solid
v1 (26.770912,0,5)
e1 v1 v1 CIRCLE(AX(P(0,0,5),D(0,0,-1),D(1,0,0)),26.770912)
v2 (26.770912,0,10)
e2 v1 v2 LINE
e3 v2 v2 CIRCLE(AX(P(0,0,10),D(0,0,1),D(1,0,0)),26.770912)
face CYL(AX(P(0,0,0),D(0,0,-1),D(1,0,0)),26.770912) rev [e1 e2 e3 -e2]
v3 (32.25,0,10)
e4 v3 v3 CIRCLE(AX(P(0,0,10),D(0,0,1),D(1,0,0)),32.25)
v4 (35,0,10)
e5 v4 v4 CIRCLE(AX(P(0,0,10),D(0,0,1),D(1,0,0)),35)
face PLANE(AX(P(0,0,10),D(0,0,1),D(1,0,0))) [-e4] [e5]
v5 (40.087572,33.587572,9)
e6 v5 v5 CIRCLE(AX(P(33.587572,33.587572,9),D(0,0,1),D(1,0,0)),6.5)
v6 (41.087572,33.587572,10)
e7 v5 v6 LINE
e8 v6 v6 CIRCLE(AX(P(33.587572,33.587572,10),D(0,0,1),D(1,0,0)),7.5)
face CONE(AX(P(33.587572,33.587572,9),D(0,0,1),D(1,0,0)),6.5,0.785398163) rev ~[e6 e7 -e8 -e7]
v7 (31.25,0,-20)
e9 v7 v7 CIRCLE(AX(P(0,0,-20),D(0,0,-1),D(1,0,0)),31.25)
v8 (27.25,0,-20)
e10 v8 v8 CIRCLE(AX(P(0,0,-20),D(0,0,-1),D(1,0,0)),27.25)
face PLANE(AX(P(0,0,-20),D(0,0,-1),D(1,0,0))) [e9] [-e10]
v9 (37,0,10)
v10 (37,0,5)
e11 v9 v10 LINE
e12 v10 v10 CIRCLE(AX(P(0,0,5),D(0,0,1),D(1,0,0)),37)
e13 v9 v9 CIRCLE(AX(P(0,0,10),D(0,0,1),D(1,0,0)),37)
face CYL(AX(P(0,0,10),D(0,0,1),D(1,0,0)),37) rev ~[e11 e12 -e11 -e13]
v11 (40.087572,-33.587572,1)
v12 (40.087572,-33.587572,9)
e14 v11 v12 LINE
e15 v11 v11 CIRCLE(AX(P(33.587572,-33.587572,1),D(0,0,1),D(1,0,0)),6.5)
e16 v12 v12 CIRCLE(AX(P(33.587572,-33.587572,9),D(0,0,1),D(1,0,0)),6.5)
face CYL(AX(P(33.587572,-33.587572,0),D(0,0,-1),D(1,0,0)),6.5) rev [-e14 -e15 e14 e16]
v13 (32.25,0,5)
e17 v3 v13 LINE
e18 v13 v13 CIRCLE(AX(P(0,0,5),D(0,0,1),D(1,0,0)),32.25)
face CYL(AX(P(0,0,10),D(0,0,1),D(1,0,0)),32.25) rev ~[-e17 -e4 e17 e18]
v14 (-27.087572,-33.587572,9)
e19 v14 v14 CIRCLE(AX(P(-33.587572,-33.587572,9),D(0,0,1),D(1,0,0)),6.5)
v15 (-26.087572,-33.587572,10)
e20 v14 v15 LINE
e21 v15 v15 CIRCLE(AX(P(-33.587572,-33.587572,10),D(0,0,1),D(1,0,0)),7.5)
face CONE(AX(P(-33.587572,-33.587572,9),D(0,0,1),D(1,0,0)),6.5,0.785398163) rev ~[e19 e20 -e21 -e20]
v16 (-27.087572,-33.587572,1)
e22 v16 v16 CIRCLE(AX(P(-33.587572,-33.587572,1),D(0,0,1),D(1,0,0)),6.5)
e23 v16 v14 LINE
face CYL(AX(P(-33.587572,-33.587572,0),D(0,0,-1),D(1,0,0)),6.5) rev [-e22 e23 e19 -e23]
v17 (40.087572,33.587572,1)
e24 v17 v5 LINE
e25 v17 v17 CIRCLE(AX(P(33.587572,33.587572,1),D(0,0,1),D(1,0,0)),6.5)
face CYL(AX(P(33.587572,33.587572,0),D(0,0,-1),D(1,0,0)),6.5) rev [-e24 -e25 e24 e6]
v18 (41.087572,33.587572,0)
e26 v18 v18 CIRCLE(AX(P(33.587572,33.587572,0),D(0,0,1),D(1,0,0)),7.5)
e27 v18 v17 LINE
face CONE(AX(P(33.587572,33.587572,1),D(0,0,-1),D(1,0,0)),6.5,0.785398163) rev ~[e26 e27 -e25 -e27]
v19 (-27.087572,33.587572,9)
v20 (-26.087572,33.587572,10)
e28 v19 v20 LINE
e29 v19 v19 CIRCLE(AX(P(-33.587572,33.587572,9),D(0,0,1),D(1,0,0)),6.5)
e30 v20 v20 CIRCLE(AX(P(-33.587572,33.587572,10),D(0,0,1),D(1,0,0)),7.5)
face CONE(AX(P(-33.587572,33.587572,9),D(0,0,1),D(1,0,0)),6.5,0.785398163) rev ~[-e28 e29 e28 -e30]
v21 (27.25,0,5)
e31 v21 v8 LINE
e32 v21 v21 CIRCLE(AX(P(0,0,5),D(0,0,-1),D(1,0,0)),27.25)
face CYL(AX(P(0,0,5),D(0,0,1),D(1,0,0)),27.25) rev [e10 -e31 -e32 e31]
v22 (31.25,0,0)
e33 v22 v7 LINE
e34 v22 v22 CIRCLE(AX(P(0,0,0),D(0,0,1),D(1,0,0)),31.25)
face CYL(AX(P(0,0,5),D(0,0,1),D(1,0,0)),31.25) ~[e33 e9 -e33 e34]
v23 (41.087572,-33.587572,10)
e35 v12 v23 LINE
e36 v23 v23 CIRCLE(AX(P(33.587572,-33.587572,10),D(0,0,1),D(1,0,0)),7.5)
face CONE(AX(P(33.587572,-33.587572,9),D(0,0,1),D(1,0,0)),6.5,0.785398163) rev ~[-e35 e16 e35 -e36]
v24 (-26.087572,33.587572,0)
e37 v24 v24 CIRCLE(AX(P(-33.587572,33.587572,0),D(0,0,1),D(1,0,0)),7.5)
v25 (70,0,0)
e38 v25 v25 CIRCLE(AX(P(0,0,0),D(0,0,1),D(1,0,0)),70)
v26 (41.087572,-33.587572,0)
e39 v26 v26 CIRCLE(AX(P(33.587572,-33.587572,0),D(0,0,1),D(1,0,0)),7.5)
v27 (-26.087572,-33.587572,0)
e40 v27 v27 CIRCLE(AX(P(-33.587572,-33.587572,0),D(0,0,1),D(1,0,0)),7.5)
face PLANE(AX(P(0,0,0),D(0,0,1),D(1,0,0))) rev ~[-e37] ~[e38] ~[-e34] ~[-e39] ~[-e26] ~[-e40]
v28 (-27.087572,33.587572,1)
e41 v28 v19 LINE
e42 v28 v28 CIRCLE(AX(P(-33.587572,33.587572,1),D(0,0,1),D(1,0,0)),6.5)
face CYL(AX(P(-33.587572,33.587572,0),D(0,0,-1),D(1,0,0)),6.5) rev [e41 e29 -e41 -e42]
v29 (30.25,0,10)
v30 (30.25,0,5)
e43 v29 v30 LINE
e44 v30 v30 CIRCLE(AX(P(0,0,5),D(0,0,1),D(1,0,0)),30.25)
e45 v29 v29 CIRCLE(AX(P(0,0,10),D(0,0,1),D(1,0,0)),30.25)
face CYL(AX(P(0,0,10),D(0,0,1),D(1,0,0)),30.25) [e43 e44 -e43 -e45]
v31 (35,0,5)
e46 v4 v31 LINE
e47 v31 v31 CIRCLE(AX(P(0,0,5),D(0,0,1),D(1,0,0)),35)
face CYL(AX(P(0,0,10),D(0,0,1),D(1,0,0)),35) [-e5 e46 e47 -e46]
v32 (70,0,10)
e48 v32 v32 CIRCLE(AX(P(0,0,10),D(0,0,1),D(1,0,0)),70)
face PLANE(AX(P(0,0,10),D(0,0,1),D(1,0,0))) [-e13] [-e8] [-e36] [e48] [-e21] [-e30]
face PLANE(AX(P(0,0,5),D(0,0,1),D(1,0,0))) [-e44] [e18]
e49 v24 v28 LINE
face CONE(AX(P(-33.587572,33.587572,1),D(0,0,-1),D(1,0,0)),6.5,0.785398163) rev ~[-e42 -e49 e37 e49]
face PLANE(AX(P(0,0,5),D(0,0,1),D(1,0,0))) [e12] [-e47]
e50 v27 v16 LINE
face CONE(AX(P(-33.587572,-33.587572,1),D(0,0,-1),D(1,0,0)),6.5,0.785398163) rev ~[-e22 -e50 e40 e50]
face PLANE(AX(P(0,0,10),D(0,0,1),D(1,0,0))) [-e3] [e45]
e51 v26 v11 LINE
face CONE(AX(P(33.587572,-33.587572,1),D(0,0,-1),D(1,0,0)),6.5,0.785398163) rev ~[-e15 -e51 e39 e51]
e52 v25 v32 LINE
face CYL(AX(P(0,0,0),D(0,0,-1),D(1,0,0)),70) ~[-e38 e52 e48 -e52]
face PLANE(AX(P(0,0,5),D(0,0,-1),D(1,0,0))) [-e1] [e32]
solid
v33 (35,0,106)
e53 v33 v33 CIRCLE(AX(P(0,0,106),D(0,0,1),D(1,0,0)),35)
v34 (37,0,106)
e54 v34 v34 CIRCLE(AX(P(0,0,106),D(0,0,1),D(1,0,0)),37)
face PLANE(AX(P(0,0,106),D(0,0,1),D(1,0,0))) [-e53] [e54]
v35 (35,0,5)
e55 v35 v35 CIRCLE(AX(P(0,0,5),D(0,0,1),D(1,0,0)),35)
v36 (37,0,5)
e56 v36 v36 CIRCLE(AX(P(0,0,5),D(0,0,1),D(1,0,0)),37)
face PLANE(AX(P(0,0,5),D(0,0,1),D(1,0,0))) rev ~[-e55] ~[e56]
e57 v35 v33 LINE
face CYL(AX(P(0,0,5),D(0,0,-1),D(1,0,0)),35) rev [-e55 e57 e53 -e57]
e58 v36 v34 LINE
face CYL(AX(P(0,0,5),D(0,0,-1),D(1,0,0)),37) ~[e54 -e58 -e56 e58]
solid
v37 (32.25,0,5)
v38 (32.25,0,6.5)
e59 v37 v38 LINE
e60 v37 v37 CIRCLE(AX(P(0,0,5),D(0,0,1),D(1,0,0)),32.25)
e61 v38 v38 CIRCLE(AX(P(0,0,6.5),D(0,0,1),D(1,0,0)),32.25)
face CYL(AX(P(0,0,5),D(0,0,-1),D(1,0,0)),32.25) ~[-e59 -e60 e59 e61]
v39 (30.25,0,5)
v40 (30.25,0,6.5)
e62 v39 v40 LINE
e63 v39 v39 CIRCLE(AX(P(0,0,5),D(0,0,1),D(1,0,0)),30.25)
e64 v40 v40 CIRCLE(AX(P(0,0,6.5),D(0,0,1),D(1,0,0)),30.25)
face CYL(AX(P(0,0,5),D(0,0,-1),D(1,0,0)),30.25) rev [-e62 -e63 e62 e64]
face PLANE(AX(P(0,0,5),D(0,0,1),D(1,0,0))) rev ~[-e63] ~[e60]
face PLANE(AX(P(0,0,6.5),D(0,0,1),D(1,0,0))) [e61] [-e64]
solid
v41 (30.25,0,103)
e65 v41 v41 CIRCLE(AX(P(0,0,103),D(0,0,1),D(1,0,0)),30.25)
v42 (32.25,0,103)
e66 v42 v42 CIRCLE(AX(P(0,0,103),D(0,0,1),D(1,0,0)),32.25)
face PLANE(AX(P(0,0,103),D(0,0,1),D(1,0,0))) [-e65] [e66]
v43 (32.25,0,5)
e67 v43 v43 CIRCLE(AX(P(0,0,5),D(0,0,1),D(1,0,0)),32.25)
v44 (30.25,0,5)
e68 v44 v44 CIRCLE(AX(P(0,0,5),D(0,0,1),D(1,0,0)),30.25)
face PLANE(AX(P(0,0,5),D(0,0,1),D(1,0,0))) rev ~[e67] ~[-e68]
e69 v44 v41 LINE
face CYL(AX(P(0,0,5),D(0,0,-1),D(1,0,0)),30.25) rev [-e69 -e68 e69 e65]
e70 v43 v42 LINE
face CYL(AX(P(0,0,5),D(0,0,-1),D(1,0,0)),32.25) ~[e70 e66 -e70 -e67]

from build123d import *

# Parameters (mm, degrees)
F0_R      = 70
F0_R_2    = 6.5
F0_R_3    = 26.7709117697
F1_DEPTH  = 10
F2_R      = 30.15
F3_DEPTH  = 5
F4_R      = 31.25
F4_R_2    = 27.25
F5_DEPTH  = 25
F6_SIZE   = 1
F7_R      = 32.25
F7_R_2    = 30.25
F8_DEPTH  = 5
F9_R      = 37
F9_R_2    = 35
F10_DEPTH = 5
F11_R     = 32.25
F11_R_2   = 30.25
F12_DEPTH = 98
F13_R     = 37
F13_R_2   = 35
F14_DEPTH = 101
F15_R     = 32.25
F15_R_2   = 30.25
F16_DEPTH = 1.5


with BuildPart() as f1:
    # F0 (on Top) → F1 (new body)
    with BuildSketch(Plane.XY):
        Circle(F0_R)
        with Locations((-33.5875721064, -33.5875721064)):
            Circle(F0_R_2, mode=Mode.SUBTRACT)
        with Locations((33.5875721064, -33.5875721064)):
            Circle(F0_R_2, mode=Mode.SUBTRACT)
        with Locations((-33.5875721064, 33.5875721064)):
            Circle(F0_R_2, mode=Mode.SUBTRACT)
        Circle(F0_R_3, mode=Mode.SUBTRACT)
        with Locations((33.5875721064, 33.5875721064)):
            Circle(F0_R_2, mode=Mode.SUBTRACT)
    extrude(amount=F1_DEPTH)

    # F2 (on face) → F3 (cut)
    with BuildSketch(Plane(origin=(0, 0, 0), x_dir=(1, 0, 0), z_dir=(0, 0, -1))):
        Circle(F2_R)
    extrude(amount=-F3_DEPTH, mode=Mode.SUBTRACT)

    # F4 (on face) → F5 (join)
    with BuildSketch(Plane(origin=(0, 0, 5), x_dir=(1, 0, 0), z_dir=(0, 0, -1))):
        Circle(F4_R)
        Circle(F4_R_2, mode=Mode.SUBTRACT)
    extrude(amount=F5_DEPTH)

    # F6
    f6_edges = [f1.edges().sort_by_distance(p)[0] for p in [
        (-40.087572, 33.587572, 0),
        (27.087572, 33.587572, 0),
        (27.087572, -33.587572, 0),
        (-40.087572, -33.587572, 0),
        (27.087572, 33.587572, 10),
        (27.087572, -33.587572, 10),
        (-40.087572, -33.587572, 10),
        (-40.087572, 33.587572, 10),
    ]]
    chamfer(f6_edges, length=F6_SIZE)

    # F7 (on face) → F8 (cut)
    with BuildSketch(Plane.XY.offset(10)):
        Circle(F7_R)
        Circle(F7_R_2, mode=Mode.SUBTRACT)
    extrude(amount=-F8_DEPTH, mode=Mode.SUBTRACT)

    # F9 (on face) → F10 (cut)
    with BuildSketch(Plane.XY.offset(10)):
        Circle(F9_R)
        Circle(F9_R_2, mode=Mode.SUBTRACT)
    extrude(amount=-F10_DEPTH, mode=Mode.SUBTRACT)


with BuildPart() as f12:
    # F11 (on face) → F12 (new body)
    with BuildSketch(Plane.XY.offset(5)):
        Circle(F11_R)
        Circle(F11_R_2, mode=Mode.SUBTRACT)
    extrude(amount=F12_DEPTH)


with BuildPart() as f14:
    # F13 (on face) → F14 (new body)
    with BuildSketch(Plane.XY.offset(5)):
        Circle(F13_R)
        Circle(F13_R_2, mode=Mode.SUBTRACT)
    extrude(amount=F14_DEPTH)


with BuildPart() as f16:
    # F15 (on face) → F16 (new body)
    with BuildSketch(Plane.XY.offset(5)):
        Circle(F15_R)
        Circle(F15_R_2, mode=Mode.SUBTRACT)
    extrude(amount=F16_DEPTH)


solid = Compound([f1.part, f12.part, f14.part, f16.part])
